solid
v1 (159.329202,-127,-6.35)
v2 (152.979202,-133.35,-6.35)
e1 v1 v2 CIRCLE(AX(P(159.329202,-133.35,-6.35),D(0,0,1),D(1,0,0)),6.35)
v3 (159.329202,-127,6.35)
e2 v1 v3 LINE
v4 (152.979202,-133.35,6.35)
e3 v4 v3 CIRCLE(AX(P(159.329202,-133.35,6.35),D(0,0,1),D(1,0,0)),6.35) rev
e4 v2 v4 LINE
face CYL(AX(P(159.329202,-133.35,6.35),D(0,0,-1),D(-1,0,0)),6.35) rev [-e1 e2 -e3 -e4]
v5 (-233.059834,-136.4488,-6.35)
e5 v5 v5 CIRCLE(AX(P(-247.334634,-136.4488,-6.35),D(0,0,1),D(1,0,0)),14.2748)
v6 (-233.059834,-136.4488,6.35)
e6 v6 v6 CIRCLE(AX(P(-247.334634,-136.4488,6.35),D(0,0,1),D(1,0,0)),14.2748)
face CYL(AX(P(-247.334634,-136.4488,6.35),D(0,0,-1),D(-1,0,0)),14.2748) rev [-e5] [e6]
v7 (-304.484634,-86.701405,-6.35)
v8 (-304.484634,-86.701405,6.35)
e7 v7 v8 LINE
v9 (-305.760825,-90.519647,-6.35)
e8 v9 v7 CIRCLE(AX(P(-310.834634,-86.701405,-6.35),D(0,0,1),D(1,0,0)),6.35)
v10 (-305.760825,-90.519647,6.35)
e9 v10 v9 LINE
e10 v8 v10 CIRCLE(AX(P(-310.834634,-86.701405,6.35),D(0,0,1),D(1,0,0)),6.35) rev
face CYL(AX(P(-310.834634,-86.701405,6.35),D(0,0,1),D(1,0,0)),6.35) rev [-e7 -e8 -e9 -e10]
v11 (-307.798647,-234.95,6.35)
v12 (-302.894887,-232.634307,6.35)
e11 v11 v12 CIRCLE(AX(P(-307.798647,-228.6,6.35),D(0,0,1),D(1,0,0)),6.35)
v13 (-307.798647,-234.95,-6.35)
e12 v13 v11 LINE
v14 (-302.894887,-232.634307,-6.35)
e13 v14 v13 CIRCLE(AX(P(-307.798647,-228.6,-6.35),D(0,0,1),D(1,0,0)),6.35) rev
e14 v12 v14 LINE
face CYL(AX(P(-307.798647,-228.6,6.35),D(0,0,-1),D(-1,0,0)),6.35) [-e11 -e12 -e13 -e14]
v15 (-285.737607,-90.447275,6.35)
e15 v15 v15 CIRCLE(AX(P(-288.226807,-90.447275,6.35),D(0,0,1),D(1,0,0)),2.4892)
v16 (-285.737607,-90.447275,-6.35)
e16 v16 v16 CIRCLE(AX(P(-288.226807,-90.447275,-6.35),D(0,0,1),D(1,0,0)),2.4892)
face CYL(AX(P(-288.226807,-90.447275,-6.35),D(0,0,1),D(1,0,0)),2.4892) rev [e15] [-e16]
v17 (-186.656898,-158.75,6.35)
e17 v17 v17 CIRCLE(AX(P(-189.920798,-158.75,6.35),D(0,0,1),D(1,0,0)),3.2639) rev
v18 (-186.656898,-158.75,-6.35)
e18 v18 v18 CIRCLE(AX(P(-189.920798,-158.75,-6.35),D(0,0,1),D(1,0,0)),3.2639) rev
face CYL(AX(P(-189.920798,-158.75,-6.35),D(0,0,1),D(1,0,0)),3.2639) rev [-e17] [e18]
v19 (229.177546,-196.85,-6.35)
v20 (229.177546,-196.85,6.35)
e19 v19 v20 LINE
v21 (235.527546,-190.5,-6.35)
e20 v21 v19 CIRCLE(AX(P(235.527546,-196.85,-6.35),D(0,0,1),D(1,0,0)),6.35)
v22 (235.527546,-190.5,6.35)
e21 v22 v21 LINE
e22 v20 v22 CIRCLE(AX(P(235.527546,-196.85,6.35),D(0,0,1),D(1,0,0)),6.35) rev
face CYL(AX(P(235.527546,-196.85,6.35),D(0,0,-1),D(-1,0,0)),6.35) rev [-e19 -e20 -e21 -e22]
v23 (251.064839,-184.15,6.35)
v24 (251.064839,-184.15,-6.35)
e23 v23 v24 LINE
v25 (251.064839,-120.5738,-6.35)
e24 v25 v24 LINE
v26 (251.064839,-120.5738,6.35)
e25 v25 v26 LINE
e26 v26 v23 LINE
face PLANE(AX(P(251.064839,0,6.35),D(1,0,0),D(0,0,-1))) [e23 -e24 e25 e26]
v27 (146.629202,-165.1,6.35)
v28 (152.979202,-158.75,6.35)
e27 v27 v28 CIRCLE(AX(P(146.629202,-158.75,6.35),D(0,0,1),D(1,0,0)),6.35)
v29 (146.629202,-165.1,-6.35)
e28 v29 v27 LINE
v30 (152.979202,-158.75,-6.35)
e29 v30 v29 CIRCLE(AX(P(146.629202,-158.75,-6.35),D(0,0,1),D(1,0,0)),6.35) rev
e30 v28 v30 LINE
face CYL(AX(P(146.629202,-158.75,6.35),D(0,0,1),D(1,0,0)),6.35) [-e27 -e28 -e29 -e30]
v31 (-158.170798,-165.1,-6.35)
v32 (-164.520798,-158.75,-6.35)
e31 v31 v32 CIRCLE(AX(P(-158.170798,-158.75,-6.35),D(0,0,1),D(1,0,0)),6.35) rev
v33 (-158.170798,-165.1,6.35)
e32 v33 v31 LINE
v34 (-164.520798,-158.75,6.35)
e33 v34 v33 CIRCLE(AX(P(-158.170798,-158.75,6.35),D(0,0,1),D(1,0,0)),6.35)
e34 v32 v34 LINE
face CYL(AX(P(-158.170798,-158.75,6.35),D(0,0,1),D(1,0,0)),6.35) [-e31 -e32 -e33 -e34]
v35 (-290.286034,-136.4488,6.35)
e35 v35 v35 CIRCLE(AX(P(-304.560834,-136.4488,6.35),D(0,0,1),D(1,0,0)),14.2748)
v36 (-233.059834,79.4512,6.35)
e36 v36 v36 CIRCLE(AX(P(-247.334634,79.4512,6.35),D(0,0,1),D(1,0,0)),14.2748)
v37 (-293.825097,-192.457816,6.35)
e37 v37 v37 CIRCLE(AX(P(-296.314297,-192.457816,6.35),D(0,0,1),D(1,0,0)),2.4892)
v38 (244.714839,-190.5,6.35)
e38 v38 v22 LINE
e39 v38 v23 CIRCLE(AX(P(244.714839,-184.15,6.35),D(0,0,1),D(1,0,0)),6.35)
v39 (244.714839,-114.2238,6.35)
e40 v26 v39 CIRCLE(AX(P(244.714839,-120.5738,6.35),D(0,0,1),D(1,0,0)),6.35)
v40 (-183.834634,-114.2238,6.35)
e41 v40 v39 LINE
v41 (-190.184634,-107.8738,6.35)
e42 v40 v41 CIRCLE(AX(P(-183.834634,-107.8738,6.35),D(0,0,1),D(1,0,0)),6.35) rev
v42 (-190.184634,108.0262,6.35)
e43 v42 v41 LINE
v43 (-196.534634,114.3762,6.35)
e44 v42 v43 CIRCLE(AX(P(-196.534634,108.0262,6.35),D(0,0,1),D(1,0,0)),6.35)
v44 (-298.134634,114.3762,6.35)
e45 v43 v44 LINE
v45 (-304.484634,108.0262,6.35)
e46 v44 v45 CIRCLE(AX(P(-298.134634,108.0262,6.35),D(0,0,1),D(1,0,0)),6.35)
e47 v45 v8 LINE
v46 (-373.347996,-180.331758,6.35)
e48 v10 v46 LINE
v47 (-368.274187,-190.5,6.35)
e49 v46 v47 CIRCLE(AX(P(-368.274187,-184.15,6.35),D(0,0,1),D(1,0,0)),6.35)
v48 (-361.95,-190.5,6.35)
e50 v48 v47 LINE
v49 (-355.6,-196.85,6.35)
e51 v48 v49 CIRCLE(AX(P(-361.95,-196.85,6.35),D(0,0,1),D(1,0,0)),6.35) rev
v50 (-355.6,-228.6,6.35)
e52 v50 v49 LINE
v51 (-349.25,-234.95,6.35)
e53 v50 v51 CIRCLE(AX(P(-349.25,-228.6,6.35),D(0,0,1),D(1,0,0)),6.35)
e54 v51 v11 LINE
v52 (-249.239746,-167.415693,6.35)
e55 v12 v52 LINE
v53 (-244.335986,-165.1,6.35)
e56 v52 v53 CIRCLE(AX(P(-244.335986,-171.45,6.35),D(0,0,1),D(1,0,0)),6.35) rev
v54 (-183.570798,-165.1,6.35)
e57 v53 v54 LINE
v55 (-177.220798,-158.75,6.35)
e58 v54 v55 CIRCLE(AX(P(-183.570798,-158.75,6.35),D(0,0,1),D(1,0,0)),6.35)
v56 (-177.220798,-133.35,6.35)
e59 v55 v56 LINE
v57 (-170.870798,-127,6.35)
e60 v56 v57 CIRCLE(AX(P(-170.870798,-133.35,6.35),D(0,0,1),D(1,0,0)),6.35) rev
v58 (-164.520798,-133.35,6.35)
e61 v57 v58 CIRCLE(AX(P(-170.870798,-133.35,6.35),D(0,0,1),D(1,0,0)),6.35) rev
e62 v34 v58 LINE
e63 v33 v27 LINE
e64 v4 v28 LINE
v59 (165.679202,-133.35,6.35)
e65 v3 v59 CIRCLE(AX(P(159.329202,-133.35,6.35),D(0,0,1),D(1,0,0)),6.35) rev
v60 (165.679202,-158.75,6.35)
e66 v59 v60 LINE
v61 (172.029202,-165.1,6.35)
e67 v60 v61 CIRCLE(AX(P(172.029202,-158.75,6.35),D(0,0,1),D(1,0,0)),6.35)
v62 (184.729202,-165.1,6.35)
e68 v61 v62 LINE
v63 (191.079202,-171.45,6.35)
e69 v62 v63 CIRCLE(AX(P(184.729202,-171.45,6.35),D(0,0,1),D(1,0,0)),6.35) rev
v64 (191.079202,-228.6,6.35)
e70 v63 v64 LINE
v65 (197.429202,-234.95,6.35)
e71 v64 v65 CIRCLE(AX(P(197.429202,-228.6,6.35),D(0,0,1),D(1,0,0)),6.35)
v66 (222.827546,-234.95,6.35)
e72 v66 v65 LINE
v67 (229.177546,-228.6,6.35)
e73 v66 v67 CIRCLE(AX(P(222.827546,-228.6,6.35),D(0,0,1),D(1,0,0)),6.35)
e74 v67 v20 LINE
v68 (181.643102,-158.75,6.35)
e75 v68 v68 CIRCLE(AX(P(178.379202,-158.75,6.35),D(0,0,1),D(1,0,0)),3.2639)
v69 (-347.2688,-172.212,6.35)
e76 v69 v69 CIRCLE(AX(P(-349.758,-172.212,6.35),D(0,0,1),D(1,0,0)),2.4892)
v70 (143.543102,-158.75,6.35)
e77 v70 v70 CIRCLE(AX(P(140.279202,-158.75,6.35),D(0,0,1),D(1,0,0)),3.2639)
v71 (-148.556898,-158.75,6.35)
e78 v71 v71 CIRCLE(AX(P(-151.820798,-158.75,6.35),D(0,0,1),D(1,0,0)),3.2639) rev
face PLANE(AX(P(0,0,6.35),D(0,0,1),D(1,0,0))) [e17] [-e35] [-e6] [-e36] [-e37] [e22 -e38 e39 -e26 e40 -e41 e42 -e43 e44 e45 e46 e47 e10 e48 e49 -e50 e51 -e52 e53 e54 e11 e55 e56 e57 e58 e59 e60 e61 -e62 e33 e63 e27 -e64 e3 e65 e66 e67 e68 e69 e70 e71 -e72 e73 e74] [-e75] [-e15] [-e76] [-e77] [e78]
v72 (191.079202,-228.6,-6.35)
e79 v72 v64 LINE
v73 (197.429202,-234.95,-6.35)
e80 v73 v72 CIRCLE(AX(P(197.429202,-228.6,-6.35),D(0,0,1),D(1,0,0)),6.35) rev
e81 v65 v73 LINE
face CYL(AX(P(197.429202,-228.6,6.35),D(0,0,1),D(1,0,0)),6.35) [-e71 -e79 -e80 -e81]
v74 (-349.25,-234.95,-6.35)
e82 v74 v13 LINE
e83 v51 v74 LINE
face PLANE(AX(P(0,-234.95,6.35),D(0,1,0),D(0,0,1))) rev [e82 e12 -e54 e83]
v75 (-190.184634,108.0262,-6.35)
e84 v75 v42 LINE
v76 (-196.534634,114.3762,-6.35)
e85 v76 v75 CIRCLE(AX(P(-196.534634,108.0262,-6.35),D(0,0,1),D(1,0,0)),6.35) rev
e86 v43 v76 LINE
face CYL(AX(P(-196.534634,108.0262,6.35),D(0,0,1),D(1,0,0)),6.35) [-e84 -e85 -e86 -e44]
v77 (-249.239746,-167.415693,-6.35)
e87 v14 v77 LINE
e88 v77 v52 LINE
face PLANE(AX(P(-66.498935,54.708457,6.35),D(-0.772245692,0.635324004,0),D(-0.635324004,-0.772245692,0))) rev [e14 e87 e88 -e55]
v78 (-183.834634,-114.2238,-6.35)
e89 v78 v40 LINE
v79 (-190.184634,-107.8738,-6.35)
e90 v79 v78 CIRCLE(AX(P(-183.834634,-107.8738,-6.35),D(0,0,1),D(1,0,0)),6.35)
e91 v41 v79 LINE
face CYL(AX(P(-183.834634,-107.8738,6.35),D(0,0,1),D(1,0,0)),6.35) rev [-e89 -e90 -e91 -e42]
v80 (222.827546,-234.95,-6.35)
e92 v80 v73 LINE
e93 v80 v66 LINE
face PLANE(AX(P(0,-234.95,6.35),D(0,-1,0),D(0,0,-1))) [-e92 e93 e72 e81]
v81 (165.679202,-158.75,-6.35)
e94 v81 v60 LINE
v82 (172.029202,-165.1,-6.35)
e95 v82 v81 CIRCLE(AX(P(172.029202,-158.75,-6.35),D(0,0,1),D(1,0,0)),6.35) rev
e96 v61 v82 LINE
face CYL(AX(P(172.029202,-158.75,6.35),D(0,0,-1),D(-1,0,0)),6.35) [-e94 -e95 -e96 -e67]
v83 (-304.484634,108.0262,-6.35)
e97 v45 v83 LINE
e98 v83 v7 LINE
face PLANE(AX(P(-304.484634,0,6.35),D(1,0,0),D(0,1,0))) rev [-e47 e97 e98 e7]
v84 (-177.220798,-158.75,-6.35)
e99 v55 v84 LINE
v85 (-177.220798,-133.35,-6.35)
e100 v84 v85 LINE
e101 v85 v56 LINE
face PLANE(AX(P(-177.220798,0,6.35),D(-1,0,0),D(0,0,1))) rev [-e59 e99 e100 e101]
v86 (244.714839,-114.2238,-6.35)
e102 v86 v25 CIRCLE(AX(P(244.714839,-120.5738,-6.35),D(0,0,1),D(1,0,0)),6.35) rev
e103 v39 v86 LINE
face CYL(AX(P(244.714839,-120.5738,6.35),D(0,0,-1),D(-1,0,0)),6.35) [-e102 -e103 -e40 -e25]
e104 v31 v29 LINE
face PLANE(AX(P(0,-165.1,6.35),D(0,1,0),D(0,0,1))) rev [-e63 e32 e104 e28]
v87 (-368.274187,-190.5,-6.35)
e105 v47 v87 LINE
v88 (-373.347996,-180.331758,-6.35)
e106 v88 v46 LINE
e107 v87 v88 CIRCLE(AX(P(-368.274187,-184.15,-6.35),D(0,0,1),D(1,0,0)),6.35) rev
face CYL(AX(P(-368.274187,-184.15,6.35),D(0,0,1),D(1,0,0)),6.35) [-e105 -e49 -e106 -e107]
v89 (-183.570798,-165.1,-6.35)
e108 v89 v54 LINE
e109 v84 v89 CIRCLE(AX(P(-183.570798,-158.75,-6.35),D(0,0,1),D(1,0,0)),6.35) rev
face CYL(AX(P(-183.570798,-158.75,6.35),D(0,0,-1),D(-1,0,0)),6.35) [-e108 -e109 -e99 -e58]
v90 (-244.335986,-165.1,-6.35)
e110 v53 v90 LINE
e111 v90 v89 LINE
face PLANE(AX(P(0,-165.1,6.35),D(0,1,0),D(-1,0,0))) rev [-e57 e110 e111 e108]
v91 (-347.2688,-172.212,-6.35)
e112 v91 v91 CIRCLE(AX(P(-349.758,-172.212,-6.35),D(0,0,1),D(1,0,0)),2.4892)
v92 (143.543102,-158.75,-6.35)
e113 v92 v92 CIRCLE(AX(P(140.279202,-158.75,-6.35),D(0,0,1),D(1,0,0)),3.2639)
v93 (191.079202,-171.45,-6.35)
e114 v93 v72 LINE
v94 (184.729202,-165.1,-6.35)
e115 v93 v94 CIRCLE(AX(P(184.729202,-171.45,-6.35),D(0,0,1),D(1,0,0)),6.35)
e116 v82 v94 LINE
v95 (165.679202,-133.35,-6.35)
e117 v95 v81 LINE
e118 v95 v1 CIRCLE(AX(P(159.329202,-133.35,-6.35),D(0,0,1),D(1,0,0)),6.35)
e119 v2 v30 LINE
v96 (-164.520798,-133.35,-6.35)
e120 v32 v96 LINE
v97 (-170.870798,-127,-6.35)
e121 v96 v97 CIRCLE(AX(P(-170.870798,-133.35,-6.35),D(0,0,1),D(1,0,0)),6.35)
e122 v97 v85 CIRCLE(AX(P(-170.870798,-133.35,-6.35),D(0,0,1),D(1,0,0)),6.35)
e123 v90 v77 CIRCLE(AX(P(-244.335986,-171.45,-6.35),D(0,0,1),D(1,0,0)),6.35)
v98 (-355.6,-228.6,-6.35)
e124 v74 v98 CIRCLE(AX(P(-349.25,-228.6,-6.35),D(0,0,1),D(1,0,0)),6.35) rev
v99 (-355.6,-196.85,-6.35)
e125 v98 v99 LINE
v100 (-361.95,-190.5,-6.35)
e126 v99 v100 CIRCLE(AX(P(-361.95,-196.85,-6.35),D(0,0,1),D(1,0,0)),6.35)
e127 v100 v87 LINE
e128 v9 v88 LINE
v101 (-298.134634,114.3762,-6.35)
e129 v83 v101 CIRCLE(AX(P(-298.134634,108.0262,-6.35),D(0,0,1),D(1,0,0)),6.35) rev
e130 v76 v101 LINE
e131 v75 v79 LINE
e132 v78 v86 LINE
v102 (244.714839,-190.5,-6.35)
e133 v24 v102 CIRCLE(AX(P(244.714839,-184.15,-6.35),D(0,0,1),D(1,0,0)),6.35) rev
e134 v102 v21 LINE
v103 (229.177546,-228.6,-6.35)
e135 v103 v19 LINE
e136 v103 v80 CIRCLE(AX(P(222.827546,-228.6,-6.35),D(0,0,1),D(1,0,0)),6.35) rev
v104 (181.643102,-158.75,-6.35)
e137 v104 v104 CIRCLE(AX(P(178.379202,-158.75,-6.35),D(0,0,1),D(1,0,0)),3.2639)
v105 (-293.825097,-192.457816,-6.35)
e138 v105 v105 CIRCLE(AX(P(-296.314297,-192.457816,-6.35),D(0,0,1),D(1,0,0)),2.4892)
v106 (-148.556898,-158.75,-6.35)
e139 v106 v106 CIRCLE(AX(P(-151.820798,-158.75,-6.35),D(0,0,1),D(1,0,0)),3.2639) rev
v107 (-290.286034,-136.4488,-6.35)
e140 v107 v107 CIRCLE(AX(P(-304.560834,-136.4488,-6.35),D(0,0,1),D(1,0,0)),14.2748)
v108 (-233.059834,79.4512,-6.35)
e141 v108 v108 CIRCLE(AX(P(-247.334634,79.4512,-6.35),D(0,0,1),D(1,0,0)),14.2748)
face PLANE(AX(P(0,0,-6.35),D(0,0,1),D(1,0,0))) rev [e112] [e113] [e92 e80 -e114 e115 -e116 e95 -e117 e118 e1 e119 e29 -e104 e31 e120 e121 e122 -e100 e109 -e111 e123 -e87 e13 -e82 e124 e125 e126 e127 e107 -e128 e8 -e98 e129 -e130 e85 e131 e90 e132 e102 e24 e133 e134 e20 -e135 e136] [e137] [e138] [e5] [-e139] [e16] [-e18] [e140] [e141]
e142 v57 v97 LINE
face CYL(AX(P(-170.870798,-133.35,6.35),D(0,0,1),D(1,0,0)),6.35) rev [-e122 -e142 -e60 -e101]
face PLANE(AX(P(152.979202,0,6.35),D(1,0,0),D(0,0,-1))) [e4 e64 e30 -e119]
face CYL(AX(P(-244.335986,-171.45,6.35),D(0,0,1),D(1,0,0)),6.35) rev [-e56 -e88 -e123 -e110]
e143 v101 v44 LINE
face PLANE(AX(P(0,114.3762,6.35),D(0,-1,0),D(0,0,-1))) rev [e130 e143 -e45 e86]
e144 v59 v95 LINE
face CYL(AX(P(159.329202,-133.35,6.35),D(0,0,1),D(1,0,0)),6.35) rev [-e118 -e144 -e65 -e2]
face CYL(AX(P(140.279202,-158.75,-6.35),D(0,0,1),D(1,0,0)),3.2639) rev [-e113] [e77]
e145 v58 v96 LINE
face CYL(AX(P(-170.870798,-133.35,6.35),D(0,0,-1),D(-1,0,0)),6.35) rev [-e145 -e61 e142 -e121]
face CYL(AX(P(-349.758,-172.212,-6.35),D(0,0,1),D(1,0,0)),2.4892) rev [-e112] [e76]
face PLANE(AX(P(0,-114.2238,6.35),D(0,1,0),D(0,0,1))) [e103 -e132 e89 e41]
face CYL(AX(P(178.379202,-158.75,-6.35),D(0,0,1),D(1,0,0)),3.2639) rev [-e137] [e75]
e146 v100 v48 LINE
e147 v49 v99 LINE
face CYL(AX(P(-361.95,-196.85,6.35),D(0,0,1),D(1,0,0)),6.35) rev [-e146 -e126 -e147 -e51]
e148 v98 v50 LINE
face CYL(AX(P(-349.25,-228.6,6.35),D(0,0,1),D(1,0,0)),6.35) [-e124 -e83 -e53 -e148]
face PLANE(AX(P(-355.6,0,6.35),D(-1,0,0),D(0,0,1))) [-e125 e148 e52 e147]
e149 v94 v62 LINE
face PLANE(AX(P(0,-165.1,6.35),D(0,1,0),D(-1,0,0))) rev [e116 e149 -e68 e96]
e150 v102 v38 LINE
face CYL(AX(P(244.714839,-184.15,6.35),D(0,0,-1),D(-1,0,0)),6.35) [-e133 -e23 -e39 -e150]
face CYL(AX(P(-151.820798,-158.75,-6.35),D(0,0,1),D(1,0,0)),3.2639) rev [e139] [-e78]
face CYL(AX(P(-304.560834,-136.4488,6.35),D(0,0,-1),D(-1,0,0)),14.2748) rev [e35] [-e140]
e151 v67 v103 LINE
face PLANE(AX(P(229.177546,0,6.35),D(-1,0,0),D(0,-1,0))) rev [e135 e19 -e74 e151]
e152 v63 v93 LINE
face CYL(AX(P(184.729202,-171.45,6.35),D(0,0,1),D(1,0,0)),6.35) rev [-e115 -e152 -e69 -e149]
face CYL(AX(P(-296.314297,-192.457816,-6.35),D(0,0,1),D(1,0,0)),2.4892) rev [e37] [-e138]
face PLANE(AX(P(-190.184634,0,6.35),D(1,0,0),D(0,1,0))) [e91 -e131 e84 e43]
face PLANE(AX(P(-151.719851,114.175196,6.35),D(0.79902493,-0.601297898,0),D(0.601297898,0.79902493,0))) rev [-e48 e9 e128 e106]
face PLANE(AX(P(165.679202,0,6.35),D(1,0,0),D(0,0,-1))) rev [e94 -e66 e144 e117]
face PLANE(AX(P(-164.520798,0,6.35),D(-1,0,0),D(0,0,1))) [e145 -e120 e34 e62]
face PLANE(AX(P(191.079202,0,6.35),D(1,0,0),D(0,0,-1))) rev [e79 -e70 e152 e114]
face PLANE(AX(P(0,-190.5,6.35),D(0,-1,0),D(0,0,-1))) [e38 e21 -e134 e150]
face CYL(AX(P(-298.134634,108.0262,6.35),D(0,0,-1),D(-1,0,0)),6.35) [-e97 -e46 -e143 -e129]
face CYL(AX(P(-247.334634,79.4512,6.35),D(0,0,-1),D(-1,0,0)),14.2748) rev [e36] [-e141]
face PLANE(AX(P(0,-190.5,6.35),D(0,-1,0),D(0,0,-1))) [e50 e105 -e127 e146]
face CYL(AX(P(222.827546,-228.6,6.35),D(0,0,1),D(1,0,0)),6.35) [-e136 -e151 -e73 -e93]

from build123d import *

# Parameters (mm, degrees)
SKETCH1_R           = 14.2748
BOSS_EXTRUDE1_DEPTH = 6.35
SKETCH2_R           = 2.4892
CUT_EXTRUDE1_DEPTH  = 448.798830392
FILLET1_R           = 6.35
SKETCH3_R           = 3.2639
CUT_EXTRUDE2_DEPTH  = 448.798830392
FILLET2_R           = 6.35


with BuildPart() as part:
    # Sketch1 → Boss-Extrude1 (new, symmetric)
    # profile 1 of 2: a face of its own
    with BuildSketch(Plane.XY):
        Polygon((-190.184633538, -88.8238), (-190.184633538, 114.3762), (-304.484633538, 114.3762), (-304.484633538, -88.8238), (-381, -190.5), (-355.6, -190.5), (-355.6, -234.95), (-304.8, -234.95), (-247.334633538, -165.1), (-177.220797536, -165.1), (-177.220797536, -127), (-164.520797536, -127), (-164.520797536, -165.1), (152.979202464, -165.1), (152.979202464, -127), (165.679202464, -127), (165.679202464, -165.1), (191.079202464, -165.1), (191.079202464, -234.95), (229.17754613, -234.95), (229.17754613, -190.5), (251.064839113, -190.5), (251.064839113, -114.2238), (-190.184633538, -114.2238), align=None)
        with Locations((-304.560833538, -136.4488)):
            Circle(SKETCH1_R, mode=Mode.SUBTRACT)
        with Locations((-247.334633538, -136.4488)):
            Circle(SKETCH1_R, mode=Mode.SUBTRACT)
        with Locations((-247.334633538, 79.4512)):
            Circle(SKETCH1_R, mode=Mode.SUBTRACT)
    # profile 2 of 2: a face of its own
    with BuildSketch(Plane.XY):
        Polygon((-190.184633538, -88.8238), (-190.184633538, 114.3762), (-304.484633538, 114.3762), (-304.484633538, -88.8238), (-381, -190.5), (-355.6, -190.5), (-355.6, -234.95), (-304.8, -234.95), (-247.334633538, -165.1), (-177.220797536, -165.1), (-177.220797536, -127), (-164.520797536, -127), (-164.520797536, -165.1), (152.979202464, -165.1), (152.979202464, -127), (165.679202464, -127), (165.679202464, -165.1), (191.079202464, -165.1), (191.079202464, -234.95), (229.17754613, -234.95), (229.17754613, -190.5), (251.064839113, -190.5), (251.064839113, -114.2238), (-190.184633538, -114.2238), align=None)
        with Locations((-304.560833538, -136.4488)):
            Circle(SKETCH1_R, mode=Mode.SUBTRACT)
        with Locations((-247.334633538, -136.4488)):
            Circle(SKETCH1_R, mode=Mode.SUBTRACT)
        with Locations((-247.334633538, 79.4512)):
            Circle(SKETCH1_R, mode=Mode.SUBTRACT)
    extrude(amount=BOSS_EXTRUDE1_DEPTH, both=True)

    # Sketch2 → Cut-Extrude1 (cut, through all)
    with BuildSketch(Plane.XY.offset(6.35)):
        with Locations((-288.22680671, -90.447274763)):
            Circle(SKETCH2_R)
        with Locations((-349.758, -172.212)):
            Circle(SKETCH2_R)
        with Locations((-296.314296632, -192.457816118)):
            Circle(SKETCH2_R)
    extrude(amount=-CUT_EXTRUDE1_DEPTH, mode=Mode.SUBTRACT)

    # Fillet1
    fillet1_edges = [part.edges().sort_by_distance(p)[0] for p in [
        (152.979202464, -127, 0),
        (165.679202464, -127, 0),
        (-164.520797536, -127, 0),
        (-177.220797536, -127, 0),
    ]]
    fillet(fillet1_edges, radius=FILLET1_R - 0.0001)  # a hair under: the kernel refuses the full size

    # Sketch3 → Cut-Extrude2 (cut, through all)
    with BuildSketch(Plane.XY.offset(6.35)):
        with Locations((-189.920797536, -158.75)):
            Circle(SKETCH3_R)
        with Locations((178.379202464, -158.75)):
            Circle(SKETCH3_R)
        with Locations((-151.820797536, -158.75)):
            Circle(SKETCH3_R)
        with Locations((140.279202464, -158.75)):
            Circle(SKETCH3_R)
    extrude(amount=-CUT_EXTRUDE2_DEPTH, mode=Mode.SUBTRACT)

    # Fillet2
    fillet2_edges = [part.edges().sort_by_distance(p)[0] for p in [
        (251.064839113, -190.5, 0),
        (229.17754613, -190.5, 0),
        (229.17754613, -234.95, 0),
        (191.079202464, -234.95, 0),
        (191.079202464, -165.1, 0),
        (165.679202464, -165.1, 0),
        (152.979202464, -165.1, 0),
        (-164.520797536, -165.1, 0),
        (-177.220797536, -165.1, 0),
        (-247.334633538, -165.1, 0),
        (-304.8, -234.95, 0),
        (-355.6, -234.95, 0),
        (-355.6, -190.5, 0),
        (-381, -190.5, 0),
        (-304.484633538, -88.8238, 0),
        (-304.484633538, 114.3762, 0),
        (-190.184633538, 114.3762, 0),
        (-190.184633538, -114.2238, 0),
        (251.064839113, -114.2238, 0),
    ]]
    fillet(fillet2_edges, radius=FILLET2_R)


solid = part.part
